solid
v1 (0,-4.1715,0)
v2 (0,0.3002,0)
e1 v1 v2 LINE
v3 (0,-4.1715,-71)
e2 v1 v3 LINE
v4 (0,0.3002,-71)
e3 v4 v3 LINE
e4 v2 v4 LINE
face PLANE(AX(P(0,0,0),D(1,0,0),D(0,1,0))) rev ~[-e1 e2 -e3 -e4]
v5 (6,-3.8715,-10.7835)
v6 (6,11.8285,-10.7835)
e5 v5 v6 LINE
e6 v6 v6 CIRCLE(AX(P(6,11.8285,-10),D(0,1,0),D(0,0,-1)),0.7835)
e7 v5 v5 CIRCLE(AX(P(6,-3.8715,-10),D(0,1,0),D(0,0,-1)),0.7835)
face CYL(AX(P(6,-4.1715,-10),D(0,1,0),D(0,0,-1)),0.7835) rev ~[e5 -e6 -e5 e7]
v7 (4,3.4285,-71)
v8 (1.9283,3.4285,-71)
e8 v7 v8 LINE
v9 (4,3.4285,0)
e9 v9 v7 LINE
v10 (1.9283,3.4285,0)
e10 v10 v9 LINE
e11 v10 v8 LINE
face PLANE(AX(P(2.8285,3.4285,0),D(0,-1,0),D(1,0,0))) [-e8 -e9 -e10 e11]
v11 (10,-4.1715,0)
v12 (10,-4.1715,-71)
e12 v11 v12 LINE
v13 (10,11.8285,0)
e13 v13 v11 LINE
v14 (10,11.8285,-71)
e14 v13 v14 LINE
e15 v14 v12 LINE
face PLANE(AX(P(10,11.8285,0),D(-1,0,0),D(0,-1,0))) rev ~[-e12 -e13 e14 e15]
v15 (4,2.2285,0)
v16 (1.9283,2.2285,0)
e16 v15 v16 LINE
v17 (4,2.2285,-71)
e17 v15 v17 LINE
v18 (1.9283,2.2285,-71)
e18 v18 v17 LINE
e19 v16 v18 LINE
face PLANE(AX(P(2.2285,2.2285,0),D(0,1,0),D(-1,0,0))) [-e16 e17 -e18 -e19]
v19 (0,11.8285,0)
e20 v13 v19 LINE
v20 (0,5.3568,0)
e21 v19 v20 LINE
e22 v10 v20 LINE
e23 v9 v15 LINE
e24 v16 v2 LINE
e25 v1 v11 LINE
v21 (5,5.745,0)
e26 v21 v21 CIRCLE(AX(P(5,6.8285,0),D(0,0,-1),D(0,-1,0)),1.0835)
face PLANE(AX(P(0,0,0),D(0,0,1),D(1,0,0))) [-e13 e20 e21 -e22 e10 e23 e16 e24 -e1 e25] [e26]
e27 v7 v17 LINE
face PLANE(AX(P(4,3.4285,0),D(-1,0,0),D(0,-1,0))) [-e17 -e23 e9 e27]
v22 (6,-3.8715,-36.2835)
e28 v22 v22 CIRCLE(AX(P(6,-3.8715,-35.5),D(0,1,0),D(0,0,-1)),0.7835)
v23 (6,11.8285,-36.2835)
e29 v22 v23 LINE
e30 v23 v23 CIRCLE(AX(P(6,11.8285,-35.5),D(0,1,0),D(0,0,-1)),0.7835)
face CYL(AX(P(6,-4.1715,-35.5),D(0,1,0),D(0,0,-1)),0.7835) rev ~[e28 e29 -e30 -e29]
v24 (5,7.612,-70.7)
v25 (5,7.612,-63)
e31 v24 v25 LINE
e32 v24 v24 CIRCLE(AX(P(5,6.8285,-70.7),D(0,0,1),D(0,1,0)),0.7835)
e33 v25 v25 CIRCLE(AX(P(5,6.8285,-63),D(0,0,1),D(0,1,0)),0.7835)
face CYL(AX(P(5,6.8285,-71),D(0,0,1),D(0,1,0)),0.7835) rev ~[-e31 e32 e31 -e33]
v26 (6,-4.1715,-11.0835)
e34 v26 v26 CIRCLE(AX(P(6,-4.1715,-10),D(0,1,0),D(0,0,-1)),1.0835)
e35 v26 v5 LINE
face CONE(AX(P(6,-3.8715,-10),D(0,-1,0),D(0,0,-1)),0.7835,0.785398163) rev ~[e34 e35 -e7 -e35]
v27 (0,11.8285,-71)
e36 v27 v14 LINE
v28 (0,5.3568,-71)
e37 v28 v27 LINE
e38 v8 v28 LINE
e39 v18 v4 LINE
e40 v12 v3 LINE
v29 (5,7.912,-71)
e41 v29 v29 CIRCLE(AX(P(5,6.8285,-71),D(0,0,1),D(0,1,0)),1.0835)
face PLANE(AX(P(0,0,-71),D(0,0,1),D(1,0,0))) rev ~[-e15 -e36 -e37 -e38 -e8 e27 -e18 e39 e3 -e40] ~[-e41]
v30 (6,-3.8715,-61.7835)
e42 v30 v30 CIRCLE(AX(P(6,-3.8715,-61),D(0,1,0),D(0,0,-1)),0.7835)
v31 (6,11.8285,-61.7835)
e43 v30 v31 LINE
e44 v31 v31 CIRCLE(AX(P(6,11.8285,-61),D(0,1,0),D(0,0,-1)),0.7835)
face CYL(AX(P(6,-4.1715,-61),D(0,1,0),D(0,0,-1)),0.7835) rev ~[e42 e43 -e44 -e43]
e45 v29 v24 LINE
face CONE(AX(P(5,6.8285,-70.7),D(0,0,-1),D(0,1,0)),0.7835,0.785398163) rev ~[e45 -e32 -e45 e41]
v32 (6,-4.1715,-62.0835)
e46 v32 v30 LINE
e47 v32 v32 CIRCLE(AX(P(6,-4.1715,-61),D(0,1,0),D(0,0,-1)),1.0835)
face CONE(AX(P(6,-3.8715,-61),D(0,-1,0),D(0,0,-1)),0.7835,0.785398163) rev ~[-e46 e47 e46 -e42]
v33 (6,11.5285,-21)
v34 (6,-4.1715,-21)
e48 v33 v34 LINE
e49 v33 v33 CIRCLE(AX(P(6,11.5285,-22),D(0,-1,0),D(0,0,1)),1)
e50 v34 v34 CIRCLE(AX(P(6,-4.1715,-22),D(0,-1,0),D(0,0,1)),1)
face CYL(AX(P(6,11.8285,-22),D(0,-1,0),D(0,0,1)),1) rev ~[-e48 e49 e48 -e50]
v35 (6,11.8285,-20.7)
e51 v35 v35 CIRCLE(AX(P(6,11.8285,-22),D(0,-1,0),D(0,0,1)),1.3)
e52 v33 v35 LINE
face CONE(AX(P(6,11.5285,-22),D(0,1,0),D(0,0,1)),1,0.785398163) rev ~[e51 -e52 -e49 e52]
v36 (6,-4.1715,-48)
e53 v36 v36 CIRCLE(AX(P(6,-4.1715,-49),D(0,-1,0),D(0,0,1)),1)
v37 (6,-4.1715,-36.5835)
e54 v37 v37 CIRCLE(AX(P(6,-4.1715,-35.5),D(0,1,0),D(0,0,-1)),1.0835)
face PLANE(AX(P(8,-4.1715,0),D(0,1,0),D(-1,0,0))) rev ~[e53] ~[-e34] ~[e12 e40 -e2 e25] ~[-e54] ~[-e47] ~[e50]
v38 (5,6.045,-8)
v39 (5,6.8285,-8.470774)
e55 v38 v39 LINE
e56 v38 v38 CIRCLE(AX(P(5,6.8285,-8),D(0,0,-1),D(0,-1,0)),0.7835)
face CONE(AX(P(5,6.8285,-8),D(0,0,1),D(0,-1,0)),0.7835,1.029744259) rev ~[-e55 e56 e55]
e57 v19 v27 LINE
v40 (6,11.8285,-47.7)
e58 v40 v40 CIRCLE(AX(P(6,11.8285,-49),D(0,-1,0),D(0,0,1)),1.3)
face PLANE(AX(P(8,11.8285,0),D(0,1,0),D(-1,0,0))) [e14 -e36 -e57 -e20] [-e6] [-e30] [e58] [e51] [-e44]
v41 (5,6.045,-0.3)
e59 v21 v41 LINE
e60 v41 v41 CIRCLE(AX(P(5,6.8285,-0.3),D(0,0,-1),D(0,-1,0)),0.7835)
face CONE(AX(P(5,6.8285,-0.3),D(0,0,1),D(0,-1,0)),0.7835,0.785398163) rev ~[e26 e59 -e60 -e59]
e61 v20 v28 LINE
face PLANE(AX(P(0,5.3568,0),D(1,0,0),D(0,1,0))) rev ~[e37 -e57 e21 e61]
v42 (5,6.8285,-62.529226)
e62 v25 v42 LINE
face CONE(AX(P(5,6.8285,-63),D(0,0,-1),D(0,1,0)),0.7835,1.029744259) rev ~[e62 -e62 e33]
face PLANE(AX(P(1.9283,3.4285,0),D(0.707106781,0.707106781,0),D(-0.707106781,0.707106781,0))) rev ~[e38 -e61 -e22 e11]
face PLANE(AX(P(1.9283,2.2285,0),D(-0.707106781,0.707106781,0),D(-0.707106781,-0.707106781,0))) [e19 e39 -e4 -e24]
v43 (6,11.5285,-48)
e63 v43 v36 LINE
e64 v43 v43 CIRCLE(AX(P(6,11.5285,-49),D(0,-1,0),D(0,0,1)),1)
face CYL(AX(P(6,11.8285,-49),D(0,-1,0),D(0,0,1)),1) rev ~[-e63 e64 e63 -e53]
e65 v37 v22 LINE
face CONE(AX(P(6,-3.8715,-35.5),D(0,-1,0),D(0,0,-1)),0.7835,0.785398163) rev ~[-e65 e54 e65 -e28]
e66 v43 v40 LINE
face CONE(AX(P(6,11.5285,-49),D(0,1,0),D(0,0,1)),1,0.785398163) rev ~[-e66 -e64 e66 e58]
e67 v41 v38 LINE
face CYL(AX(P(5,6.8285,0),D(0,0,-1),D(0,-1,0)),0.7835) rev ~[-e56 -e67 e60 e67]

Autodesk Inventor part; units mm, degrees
ref_plane "YZ Plane" through (0, 0, 0) normal (1, 0, 0) x (0, 1, 0)
ref_plane "XZ Plane" through (0, 0, 0) normal (0, 1, 0) x (-1, 0, 0)
ref_plane "XY Plane" through (0, 0, 0) normal (0, 0, 1) x (1, 0, 0)
sketch "Sketch1" plane through (0, 0, 0) normal (0, 0, 1) x (1, 0, 0)
  line L0 (0, 0) -> (0, 5.657)
  line L1 (2.8285, 3.4285) -> (2.2285, 3.4285)
  line L2 (2.8285, 2.2285) -> (2.2285, 2.2285)
  line L3 (2.2285, 3.4285) -> (2.8285, 3.4285)
  line L4 (2.8285, 2.2285) -> (2.2285, 2.2285)
  line L5 (2.2285, 3.4285) -> (4, 3.4285)
  line L6 (4, 2.2285) -> (2.8285, 2.2285)
  line L7 (2.2285, 3.4285) -> (4, 3.4285)
  line L8 (2.2285, 3.4285) -> (4, 3.4285)
  line L9 (0, -2.1715) -> (0, 0)
  line L10 (0, 5.657) -> (0, 6.8285)
  line L11 (8, -2.1715) -> (8, 6.8285)
  line L12 (4, 3.4285) -> (4, 3.4285)
  line L13 (4, 3.4285) -> (4, 2.2285)
  line L14 (4, 2.2285) -> (4, 2.2285)
  line L15 (8, -2.1715) -> (8, -4.1715)
  line L16 (8, -4.1715) -> (0, -4.1715)
  line L17 (2.2285, 3.4285) -> (1.9283, 3.4285)
  line L18 (1.9283, 3.4285) -> (0, 5.3568)
  line L19 (2.2285, 2.2285) -> (1.9283, 2.2285)
  line L20 (1.9283, 2.2285) -> (0, 0.3002)
  line L21 (0, -2.1715) -> (0, -4.1715)
  line L22 (4, 2.8285) -> (8, 2.8285) construction
  line L23 (8, 6.8285) -> (8, 11.8285)
  line L24 (8, 11.8285) -> (0, 11.8285)
  line L25 (0, 11.8285) -> (0, 6.8285)
  line L26 (8, 11.8285) -> (10, 11.8285)
  line L27 (10, 11.8285) -> (10, -4.1715)
  line L28 (10, -4.1715) -> (8, -4.1715)
  line L29 (10, 11.8285) -> (7, 11.8285) construction
  line L30 (10, 11.8285) -> (5, 11.8285) construction
  line L31 (5, 11.8285) -> (5, 6.7848) construction
  point P0 (4.938, 0.6604)
  point P1 (0.4, 0.4)
  point P2 (0.4, 5.257)
  point P3 (0.4, -2.1715)
  point P4 (0.25, 5.407)
  point P5 (0.25, -2.1715)
  point P6 (0.25, -4.1715)
  dimension "d11" = 8
  dimension "d23" = 4
  dimension "d24" = 7
  dimension "d25" = 5
  dimension "d26" = 2
  dimension "d29" = 5
  dimension "d78" = 4
extrude "Extrusion1" add sketch "Sketch1" against normal blind 71 contours L0 L20 L19 L2 L6 L13 L5 L1 L17 L18 L10 L25 L24 L23 L11 L15 L16 L21 L9 | L15 L11 L23 L26 L27 L28
sketch "Sketch2" plane through (0, 0, 0) normal (0, 0, 1) x (1, 0, 0)
  line L0 (10, -4.1715) -> (10, 11.8285) construction
  line L1 (10, 11.8285) -> (5, 11.8285) construction
  line L2 (10, 11.8285) -> (0, 11.8285) construction
  line L3 (5, 11.8285) -> (5, 6.8285) construction
  point P0 (0, 0)
  dimension "d30" = 5
hole "Hole1" at (5, 6.8285, 0) direction (0, 0, -1) diameter 1.567 depth 8 tip angle 118 thread size "M2x0.4" class "6H" standard "ANSI Metric M Profile"
sketch "Sketch3" plane through (0, 0, -71) normal (0, 0, -1) x (-1, 0, 0)
  line L0 (-10, 11.8285) -> (-10, -4.1715) construction
  line L1 (-10, 11.8285) -> (-5, 11.8285) construction
  line L2 (0, 11.8285) -> (-10, 11.8285) construction
  line L3 (-5, 11.8285) -> (-5, 6.8285) construction
  circle A0 centre (-5, 6.8285) radius 0.7835 construction
  point P0 (0, 0)
  dimension "d38" = 5
  dimension "d40" = 5
hole "Hole2" at (5, 6.8285, -71) direction (0, 0, 1) diameter 1.567 depth 8 tip angle 118 thread size "M2x0.4" class "6H" standard "ISO Metric profile"
chamfer "Chamfer1" distance 0.3 angle 45 1 edges at (5, 7.612, 0)
chamfer "Chamfer2" distance 0.3 angle 45 1 edges at (5, 6.045, -71)
sketch "Sketch4" plane through (0, -4.1715, 0) normal (0, -1, 0) x (1, 0, 0)
  line L0 (0, 0) -> (0, -71) construction
  line L1 (0, 0) -> (0, -10) construction
  line L2 (0, -10) -> (0, -35.5) construction
  line L3 (0, -71) -> (0, -61) construction
  line L4 (0, -35.5) -> (10, -35.5) construction
  line L5 (10, 0) -> (10, -71) construction
  line L6 (0, -61) -> (10, -61) construction
  line L7 (0, -10) -> (10, -10) construction
  line L8 (0, -71) -> (6, -71)
  line L9 (6, -71) -> (6, 0)
  point P0 (5, 0)
  point P1 (5, -71)
  point P2 (6, -61)
  point P3 (6, -35.5)
  point P4 (6, -10)
  dimension "d54" = 10
  dimension "d55" = 10
  dimension "d63" = 6
  dimension "d64" = 35.5
hole "Hole3" at (6, -4.1715, -10) at (6, -4.1715, -35.5) at (6, -4.1715, -61) direction (0, 1, 0) diameter 1.567 end through all thread size "M2x0.4" class "6H" standard "ISO Metric profile"
sketch "Sketch5" plane through (0, 11.8285, 0) normal (0, 1, 0) x (1, 0, 0)
  point P0 (0, 0)
chamfer "Chamfer3" distance 0.3 angle 45 1 edges at (6, -4.1715, -9.2165)
chamfer "Chamfer4" distance 0.3 angle 45 2 edges at (6, -4.1715, -34.7165) (6, -4.1715, -60.2165)
sketch "Sketch6" plane through (0, 11.8285, 0) normal (0, 1, 0) x (1, 0, 0)
  line L0 (0, 0) -> (10, 0) projected
  line L1 (4, 71) -> (4.3098, 49.0022) construction
  line L2 (5, 0) -> (4.6902, 21.9978) construction
  point P0 (5, 61.7835)
  dimension "d71" = 22
  dimension "d72" = 22
sketch "Sketch7" plane through (0, 11.8285, 0) normal (0, 1, 0) x (1, 0, 0)
  line L0 (0, 0) -> (10, 0) projected
  line L1 (0, 0) -> (7.5, 0)
  line L2 (7.5, 0) -> (7.5, 20)
  line L3 (0, 71) -> (10, 71) projected
  line L4 (0, 71) -> (7.5, 71)
  line L5 (7.5, 71) -> (7.5, 51)
  dimension "d73" = 7.5
  dimension "d74" = 20
  dimension "d76" = 7.5
  dimension "d77" = 20
sketch "Sketch8" plane through (0, 11.8285, 0) normal (0, 1, 0) x (1, 0, 0)
  line L0 (0, 0) -> (6, 0)
  line L1 (10, 0) -> (0, 0) projected
  line L2 (6, 0) -> (6, 22)
  line L3 (0, 71) -> (6, 71)
  line L4 (10, 71) -> (0, 71) projected
  line L5 (6, 71) -> (6, 49)
  dimension "d79" = 6
  dimension "d80" = 22
  dimension "d81" = 6
  dimension "d82" = 22
hole "Hole4" at (6, 11.8285, -49) at (6, 11.8285, -22) direction (0, -1, 0) diameter 2 end through all
chamfer "Chamfer5" distance 0.3 angle 45 2 edges at (6, 11.8285, -50) (6, 11.8285, -23)
properties part number "Guide" material "Steel, Carbon"
